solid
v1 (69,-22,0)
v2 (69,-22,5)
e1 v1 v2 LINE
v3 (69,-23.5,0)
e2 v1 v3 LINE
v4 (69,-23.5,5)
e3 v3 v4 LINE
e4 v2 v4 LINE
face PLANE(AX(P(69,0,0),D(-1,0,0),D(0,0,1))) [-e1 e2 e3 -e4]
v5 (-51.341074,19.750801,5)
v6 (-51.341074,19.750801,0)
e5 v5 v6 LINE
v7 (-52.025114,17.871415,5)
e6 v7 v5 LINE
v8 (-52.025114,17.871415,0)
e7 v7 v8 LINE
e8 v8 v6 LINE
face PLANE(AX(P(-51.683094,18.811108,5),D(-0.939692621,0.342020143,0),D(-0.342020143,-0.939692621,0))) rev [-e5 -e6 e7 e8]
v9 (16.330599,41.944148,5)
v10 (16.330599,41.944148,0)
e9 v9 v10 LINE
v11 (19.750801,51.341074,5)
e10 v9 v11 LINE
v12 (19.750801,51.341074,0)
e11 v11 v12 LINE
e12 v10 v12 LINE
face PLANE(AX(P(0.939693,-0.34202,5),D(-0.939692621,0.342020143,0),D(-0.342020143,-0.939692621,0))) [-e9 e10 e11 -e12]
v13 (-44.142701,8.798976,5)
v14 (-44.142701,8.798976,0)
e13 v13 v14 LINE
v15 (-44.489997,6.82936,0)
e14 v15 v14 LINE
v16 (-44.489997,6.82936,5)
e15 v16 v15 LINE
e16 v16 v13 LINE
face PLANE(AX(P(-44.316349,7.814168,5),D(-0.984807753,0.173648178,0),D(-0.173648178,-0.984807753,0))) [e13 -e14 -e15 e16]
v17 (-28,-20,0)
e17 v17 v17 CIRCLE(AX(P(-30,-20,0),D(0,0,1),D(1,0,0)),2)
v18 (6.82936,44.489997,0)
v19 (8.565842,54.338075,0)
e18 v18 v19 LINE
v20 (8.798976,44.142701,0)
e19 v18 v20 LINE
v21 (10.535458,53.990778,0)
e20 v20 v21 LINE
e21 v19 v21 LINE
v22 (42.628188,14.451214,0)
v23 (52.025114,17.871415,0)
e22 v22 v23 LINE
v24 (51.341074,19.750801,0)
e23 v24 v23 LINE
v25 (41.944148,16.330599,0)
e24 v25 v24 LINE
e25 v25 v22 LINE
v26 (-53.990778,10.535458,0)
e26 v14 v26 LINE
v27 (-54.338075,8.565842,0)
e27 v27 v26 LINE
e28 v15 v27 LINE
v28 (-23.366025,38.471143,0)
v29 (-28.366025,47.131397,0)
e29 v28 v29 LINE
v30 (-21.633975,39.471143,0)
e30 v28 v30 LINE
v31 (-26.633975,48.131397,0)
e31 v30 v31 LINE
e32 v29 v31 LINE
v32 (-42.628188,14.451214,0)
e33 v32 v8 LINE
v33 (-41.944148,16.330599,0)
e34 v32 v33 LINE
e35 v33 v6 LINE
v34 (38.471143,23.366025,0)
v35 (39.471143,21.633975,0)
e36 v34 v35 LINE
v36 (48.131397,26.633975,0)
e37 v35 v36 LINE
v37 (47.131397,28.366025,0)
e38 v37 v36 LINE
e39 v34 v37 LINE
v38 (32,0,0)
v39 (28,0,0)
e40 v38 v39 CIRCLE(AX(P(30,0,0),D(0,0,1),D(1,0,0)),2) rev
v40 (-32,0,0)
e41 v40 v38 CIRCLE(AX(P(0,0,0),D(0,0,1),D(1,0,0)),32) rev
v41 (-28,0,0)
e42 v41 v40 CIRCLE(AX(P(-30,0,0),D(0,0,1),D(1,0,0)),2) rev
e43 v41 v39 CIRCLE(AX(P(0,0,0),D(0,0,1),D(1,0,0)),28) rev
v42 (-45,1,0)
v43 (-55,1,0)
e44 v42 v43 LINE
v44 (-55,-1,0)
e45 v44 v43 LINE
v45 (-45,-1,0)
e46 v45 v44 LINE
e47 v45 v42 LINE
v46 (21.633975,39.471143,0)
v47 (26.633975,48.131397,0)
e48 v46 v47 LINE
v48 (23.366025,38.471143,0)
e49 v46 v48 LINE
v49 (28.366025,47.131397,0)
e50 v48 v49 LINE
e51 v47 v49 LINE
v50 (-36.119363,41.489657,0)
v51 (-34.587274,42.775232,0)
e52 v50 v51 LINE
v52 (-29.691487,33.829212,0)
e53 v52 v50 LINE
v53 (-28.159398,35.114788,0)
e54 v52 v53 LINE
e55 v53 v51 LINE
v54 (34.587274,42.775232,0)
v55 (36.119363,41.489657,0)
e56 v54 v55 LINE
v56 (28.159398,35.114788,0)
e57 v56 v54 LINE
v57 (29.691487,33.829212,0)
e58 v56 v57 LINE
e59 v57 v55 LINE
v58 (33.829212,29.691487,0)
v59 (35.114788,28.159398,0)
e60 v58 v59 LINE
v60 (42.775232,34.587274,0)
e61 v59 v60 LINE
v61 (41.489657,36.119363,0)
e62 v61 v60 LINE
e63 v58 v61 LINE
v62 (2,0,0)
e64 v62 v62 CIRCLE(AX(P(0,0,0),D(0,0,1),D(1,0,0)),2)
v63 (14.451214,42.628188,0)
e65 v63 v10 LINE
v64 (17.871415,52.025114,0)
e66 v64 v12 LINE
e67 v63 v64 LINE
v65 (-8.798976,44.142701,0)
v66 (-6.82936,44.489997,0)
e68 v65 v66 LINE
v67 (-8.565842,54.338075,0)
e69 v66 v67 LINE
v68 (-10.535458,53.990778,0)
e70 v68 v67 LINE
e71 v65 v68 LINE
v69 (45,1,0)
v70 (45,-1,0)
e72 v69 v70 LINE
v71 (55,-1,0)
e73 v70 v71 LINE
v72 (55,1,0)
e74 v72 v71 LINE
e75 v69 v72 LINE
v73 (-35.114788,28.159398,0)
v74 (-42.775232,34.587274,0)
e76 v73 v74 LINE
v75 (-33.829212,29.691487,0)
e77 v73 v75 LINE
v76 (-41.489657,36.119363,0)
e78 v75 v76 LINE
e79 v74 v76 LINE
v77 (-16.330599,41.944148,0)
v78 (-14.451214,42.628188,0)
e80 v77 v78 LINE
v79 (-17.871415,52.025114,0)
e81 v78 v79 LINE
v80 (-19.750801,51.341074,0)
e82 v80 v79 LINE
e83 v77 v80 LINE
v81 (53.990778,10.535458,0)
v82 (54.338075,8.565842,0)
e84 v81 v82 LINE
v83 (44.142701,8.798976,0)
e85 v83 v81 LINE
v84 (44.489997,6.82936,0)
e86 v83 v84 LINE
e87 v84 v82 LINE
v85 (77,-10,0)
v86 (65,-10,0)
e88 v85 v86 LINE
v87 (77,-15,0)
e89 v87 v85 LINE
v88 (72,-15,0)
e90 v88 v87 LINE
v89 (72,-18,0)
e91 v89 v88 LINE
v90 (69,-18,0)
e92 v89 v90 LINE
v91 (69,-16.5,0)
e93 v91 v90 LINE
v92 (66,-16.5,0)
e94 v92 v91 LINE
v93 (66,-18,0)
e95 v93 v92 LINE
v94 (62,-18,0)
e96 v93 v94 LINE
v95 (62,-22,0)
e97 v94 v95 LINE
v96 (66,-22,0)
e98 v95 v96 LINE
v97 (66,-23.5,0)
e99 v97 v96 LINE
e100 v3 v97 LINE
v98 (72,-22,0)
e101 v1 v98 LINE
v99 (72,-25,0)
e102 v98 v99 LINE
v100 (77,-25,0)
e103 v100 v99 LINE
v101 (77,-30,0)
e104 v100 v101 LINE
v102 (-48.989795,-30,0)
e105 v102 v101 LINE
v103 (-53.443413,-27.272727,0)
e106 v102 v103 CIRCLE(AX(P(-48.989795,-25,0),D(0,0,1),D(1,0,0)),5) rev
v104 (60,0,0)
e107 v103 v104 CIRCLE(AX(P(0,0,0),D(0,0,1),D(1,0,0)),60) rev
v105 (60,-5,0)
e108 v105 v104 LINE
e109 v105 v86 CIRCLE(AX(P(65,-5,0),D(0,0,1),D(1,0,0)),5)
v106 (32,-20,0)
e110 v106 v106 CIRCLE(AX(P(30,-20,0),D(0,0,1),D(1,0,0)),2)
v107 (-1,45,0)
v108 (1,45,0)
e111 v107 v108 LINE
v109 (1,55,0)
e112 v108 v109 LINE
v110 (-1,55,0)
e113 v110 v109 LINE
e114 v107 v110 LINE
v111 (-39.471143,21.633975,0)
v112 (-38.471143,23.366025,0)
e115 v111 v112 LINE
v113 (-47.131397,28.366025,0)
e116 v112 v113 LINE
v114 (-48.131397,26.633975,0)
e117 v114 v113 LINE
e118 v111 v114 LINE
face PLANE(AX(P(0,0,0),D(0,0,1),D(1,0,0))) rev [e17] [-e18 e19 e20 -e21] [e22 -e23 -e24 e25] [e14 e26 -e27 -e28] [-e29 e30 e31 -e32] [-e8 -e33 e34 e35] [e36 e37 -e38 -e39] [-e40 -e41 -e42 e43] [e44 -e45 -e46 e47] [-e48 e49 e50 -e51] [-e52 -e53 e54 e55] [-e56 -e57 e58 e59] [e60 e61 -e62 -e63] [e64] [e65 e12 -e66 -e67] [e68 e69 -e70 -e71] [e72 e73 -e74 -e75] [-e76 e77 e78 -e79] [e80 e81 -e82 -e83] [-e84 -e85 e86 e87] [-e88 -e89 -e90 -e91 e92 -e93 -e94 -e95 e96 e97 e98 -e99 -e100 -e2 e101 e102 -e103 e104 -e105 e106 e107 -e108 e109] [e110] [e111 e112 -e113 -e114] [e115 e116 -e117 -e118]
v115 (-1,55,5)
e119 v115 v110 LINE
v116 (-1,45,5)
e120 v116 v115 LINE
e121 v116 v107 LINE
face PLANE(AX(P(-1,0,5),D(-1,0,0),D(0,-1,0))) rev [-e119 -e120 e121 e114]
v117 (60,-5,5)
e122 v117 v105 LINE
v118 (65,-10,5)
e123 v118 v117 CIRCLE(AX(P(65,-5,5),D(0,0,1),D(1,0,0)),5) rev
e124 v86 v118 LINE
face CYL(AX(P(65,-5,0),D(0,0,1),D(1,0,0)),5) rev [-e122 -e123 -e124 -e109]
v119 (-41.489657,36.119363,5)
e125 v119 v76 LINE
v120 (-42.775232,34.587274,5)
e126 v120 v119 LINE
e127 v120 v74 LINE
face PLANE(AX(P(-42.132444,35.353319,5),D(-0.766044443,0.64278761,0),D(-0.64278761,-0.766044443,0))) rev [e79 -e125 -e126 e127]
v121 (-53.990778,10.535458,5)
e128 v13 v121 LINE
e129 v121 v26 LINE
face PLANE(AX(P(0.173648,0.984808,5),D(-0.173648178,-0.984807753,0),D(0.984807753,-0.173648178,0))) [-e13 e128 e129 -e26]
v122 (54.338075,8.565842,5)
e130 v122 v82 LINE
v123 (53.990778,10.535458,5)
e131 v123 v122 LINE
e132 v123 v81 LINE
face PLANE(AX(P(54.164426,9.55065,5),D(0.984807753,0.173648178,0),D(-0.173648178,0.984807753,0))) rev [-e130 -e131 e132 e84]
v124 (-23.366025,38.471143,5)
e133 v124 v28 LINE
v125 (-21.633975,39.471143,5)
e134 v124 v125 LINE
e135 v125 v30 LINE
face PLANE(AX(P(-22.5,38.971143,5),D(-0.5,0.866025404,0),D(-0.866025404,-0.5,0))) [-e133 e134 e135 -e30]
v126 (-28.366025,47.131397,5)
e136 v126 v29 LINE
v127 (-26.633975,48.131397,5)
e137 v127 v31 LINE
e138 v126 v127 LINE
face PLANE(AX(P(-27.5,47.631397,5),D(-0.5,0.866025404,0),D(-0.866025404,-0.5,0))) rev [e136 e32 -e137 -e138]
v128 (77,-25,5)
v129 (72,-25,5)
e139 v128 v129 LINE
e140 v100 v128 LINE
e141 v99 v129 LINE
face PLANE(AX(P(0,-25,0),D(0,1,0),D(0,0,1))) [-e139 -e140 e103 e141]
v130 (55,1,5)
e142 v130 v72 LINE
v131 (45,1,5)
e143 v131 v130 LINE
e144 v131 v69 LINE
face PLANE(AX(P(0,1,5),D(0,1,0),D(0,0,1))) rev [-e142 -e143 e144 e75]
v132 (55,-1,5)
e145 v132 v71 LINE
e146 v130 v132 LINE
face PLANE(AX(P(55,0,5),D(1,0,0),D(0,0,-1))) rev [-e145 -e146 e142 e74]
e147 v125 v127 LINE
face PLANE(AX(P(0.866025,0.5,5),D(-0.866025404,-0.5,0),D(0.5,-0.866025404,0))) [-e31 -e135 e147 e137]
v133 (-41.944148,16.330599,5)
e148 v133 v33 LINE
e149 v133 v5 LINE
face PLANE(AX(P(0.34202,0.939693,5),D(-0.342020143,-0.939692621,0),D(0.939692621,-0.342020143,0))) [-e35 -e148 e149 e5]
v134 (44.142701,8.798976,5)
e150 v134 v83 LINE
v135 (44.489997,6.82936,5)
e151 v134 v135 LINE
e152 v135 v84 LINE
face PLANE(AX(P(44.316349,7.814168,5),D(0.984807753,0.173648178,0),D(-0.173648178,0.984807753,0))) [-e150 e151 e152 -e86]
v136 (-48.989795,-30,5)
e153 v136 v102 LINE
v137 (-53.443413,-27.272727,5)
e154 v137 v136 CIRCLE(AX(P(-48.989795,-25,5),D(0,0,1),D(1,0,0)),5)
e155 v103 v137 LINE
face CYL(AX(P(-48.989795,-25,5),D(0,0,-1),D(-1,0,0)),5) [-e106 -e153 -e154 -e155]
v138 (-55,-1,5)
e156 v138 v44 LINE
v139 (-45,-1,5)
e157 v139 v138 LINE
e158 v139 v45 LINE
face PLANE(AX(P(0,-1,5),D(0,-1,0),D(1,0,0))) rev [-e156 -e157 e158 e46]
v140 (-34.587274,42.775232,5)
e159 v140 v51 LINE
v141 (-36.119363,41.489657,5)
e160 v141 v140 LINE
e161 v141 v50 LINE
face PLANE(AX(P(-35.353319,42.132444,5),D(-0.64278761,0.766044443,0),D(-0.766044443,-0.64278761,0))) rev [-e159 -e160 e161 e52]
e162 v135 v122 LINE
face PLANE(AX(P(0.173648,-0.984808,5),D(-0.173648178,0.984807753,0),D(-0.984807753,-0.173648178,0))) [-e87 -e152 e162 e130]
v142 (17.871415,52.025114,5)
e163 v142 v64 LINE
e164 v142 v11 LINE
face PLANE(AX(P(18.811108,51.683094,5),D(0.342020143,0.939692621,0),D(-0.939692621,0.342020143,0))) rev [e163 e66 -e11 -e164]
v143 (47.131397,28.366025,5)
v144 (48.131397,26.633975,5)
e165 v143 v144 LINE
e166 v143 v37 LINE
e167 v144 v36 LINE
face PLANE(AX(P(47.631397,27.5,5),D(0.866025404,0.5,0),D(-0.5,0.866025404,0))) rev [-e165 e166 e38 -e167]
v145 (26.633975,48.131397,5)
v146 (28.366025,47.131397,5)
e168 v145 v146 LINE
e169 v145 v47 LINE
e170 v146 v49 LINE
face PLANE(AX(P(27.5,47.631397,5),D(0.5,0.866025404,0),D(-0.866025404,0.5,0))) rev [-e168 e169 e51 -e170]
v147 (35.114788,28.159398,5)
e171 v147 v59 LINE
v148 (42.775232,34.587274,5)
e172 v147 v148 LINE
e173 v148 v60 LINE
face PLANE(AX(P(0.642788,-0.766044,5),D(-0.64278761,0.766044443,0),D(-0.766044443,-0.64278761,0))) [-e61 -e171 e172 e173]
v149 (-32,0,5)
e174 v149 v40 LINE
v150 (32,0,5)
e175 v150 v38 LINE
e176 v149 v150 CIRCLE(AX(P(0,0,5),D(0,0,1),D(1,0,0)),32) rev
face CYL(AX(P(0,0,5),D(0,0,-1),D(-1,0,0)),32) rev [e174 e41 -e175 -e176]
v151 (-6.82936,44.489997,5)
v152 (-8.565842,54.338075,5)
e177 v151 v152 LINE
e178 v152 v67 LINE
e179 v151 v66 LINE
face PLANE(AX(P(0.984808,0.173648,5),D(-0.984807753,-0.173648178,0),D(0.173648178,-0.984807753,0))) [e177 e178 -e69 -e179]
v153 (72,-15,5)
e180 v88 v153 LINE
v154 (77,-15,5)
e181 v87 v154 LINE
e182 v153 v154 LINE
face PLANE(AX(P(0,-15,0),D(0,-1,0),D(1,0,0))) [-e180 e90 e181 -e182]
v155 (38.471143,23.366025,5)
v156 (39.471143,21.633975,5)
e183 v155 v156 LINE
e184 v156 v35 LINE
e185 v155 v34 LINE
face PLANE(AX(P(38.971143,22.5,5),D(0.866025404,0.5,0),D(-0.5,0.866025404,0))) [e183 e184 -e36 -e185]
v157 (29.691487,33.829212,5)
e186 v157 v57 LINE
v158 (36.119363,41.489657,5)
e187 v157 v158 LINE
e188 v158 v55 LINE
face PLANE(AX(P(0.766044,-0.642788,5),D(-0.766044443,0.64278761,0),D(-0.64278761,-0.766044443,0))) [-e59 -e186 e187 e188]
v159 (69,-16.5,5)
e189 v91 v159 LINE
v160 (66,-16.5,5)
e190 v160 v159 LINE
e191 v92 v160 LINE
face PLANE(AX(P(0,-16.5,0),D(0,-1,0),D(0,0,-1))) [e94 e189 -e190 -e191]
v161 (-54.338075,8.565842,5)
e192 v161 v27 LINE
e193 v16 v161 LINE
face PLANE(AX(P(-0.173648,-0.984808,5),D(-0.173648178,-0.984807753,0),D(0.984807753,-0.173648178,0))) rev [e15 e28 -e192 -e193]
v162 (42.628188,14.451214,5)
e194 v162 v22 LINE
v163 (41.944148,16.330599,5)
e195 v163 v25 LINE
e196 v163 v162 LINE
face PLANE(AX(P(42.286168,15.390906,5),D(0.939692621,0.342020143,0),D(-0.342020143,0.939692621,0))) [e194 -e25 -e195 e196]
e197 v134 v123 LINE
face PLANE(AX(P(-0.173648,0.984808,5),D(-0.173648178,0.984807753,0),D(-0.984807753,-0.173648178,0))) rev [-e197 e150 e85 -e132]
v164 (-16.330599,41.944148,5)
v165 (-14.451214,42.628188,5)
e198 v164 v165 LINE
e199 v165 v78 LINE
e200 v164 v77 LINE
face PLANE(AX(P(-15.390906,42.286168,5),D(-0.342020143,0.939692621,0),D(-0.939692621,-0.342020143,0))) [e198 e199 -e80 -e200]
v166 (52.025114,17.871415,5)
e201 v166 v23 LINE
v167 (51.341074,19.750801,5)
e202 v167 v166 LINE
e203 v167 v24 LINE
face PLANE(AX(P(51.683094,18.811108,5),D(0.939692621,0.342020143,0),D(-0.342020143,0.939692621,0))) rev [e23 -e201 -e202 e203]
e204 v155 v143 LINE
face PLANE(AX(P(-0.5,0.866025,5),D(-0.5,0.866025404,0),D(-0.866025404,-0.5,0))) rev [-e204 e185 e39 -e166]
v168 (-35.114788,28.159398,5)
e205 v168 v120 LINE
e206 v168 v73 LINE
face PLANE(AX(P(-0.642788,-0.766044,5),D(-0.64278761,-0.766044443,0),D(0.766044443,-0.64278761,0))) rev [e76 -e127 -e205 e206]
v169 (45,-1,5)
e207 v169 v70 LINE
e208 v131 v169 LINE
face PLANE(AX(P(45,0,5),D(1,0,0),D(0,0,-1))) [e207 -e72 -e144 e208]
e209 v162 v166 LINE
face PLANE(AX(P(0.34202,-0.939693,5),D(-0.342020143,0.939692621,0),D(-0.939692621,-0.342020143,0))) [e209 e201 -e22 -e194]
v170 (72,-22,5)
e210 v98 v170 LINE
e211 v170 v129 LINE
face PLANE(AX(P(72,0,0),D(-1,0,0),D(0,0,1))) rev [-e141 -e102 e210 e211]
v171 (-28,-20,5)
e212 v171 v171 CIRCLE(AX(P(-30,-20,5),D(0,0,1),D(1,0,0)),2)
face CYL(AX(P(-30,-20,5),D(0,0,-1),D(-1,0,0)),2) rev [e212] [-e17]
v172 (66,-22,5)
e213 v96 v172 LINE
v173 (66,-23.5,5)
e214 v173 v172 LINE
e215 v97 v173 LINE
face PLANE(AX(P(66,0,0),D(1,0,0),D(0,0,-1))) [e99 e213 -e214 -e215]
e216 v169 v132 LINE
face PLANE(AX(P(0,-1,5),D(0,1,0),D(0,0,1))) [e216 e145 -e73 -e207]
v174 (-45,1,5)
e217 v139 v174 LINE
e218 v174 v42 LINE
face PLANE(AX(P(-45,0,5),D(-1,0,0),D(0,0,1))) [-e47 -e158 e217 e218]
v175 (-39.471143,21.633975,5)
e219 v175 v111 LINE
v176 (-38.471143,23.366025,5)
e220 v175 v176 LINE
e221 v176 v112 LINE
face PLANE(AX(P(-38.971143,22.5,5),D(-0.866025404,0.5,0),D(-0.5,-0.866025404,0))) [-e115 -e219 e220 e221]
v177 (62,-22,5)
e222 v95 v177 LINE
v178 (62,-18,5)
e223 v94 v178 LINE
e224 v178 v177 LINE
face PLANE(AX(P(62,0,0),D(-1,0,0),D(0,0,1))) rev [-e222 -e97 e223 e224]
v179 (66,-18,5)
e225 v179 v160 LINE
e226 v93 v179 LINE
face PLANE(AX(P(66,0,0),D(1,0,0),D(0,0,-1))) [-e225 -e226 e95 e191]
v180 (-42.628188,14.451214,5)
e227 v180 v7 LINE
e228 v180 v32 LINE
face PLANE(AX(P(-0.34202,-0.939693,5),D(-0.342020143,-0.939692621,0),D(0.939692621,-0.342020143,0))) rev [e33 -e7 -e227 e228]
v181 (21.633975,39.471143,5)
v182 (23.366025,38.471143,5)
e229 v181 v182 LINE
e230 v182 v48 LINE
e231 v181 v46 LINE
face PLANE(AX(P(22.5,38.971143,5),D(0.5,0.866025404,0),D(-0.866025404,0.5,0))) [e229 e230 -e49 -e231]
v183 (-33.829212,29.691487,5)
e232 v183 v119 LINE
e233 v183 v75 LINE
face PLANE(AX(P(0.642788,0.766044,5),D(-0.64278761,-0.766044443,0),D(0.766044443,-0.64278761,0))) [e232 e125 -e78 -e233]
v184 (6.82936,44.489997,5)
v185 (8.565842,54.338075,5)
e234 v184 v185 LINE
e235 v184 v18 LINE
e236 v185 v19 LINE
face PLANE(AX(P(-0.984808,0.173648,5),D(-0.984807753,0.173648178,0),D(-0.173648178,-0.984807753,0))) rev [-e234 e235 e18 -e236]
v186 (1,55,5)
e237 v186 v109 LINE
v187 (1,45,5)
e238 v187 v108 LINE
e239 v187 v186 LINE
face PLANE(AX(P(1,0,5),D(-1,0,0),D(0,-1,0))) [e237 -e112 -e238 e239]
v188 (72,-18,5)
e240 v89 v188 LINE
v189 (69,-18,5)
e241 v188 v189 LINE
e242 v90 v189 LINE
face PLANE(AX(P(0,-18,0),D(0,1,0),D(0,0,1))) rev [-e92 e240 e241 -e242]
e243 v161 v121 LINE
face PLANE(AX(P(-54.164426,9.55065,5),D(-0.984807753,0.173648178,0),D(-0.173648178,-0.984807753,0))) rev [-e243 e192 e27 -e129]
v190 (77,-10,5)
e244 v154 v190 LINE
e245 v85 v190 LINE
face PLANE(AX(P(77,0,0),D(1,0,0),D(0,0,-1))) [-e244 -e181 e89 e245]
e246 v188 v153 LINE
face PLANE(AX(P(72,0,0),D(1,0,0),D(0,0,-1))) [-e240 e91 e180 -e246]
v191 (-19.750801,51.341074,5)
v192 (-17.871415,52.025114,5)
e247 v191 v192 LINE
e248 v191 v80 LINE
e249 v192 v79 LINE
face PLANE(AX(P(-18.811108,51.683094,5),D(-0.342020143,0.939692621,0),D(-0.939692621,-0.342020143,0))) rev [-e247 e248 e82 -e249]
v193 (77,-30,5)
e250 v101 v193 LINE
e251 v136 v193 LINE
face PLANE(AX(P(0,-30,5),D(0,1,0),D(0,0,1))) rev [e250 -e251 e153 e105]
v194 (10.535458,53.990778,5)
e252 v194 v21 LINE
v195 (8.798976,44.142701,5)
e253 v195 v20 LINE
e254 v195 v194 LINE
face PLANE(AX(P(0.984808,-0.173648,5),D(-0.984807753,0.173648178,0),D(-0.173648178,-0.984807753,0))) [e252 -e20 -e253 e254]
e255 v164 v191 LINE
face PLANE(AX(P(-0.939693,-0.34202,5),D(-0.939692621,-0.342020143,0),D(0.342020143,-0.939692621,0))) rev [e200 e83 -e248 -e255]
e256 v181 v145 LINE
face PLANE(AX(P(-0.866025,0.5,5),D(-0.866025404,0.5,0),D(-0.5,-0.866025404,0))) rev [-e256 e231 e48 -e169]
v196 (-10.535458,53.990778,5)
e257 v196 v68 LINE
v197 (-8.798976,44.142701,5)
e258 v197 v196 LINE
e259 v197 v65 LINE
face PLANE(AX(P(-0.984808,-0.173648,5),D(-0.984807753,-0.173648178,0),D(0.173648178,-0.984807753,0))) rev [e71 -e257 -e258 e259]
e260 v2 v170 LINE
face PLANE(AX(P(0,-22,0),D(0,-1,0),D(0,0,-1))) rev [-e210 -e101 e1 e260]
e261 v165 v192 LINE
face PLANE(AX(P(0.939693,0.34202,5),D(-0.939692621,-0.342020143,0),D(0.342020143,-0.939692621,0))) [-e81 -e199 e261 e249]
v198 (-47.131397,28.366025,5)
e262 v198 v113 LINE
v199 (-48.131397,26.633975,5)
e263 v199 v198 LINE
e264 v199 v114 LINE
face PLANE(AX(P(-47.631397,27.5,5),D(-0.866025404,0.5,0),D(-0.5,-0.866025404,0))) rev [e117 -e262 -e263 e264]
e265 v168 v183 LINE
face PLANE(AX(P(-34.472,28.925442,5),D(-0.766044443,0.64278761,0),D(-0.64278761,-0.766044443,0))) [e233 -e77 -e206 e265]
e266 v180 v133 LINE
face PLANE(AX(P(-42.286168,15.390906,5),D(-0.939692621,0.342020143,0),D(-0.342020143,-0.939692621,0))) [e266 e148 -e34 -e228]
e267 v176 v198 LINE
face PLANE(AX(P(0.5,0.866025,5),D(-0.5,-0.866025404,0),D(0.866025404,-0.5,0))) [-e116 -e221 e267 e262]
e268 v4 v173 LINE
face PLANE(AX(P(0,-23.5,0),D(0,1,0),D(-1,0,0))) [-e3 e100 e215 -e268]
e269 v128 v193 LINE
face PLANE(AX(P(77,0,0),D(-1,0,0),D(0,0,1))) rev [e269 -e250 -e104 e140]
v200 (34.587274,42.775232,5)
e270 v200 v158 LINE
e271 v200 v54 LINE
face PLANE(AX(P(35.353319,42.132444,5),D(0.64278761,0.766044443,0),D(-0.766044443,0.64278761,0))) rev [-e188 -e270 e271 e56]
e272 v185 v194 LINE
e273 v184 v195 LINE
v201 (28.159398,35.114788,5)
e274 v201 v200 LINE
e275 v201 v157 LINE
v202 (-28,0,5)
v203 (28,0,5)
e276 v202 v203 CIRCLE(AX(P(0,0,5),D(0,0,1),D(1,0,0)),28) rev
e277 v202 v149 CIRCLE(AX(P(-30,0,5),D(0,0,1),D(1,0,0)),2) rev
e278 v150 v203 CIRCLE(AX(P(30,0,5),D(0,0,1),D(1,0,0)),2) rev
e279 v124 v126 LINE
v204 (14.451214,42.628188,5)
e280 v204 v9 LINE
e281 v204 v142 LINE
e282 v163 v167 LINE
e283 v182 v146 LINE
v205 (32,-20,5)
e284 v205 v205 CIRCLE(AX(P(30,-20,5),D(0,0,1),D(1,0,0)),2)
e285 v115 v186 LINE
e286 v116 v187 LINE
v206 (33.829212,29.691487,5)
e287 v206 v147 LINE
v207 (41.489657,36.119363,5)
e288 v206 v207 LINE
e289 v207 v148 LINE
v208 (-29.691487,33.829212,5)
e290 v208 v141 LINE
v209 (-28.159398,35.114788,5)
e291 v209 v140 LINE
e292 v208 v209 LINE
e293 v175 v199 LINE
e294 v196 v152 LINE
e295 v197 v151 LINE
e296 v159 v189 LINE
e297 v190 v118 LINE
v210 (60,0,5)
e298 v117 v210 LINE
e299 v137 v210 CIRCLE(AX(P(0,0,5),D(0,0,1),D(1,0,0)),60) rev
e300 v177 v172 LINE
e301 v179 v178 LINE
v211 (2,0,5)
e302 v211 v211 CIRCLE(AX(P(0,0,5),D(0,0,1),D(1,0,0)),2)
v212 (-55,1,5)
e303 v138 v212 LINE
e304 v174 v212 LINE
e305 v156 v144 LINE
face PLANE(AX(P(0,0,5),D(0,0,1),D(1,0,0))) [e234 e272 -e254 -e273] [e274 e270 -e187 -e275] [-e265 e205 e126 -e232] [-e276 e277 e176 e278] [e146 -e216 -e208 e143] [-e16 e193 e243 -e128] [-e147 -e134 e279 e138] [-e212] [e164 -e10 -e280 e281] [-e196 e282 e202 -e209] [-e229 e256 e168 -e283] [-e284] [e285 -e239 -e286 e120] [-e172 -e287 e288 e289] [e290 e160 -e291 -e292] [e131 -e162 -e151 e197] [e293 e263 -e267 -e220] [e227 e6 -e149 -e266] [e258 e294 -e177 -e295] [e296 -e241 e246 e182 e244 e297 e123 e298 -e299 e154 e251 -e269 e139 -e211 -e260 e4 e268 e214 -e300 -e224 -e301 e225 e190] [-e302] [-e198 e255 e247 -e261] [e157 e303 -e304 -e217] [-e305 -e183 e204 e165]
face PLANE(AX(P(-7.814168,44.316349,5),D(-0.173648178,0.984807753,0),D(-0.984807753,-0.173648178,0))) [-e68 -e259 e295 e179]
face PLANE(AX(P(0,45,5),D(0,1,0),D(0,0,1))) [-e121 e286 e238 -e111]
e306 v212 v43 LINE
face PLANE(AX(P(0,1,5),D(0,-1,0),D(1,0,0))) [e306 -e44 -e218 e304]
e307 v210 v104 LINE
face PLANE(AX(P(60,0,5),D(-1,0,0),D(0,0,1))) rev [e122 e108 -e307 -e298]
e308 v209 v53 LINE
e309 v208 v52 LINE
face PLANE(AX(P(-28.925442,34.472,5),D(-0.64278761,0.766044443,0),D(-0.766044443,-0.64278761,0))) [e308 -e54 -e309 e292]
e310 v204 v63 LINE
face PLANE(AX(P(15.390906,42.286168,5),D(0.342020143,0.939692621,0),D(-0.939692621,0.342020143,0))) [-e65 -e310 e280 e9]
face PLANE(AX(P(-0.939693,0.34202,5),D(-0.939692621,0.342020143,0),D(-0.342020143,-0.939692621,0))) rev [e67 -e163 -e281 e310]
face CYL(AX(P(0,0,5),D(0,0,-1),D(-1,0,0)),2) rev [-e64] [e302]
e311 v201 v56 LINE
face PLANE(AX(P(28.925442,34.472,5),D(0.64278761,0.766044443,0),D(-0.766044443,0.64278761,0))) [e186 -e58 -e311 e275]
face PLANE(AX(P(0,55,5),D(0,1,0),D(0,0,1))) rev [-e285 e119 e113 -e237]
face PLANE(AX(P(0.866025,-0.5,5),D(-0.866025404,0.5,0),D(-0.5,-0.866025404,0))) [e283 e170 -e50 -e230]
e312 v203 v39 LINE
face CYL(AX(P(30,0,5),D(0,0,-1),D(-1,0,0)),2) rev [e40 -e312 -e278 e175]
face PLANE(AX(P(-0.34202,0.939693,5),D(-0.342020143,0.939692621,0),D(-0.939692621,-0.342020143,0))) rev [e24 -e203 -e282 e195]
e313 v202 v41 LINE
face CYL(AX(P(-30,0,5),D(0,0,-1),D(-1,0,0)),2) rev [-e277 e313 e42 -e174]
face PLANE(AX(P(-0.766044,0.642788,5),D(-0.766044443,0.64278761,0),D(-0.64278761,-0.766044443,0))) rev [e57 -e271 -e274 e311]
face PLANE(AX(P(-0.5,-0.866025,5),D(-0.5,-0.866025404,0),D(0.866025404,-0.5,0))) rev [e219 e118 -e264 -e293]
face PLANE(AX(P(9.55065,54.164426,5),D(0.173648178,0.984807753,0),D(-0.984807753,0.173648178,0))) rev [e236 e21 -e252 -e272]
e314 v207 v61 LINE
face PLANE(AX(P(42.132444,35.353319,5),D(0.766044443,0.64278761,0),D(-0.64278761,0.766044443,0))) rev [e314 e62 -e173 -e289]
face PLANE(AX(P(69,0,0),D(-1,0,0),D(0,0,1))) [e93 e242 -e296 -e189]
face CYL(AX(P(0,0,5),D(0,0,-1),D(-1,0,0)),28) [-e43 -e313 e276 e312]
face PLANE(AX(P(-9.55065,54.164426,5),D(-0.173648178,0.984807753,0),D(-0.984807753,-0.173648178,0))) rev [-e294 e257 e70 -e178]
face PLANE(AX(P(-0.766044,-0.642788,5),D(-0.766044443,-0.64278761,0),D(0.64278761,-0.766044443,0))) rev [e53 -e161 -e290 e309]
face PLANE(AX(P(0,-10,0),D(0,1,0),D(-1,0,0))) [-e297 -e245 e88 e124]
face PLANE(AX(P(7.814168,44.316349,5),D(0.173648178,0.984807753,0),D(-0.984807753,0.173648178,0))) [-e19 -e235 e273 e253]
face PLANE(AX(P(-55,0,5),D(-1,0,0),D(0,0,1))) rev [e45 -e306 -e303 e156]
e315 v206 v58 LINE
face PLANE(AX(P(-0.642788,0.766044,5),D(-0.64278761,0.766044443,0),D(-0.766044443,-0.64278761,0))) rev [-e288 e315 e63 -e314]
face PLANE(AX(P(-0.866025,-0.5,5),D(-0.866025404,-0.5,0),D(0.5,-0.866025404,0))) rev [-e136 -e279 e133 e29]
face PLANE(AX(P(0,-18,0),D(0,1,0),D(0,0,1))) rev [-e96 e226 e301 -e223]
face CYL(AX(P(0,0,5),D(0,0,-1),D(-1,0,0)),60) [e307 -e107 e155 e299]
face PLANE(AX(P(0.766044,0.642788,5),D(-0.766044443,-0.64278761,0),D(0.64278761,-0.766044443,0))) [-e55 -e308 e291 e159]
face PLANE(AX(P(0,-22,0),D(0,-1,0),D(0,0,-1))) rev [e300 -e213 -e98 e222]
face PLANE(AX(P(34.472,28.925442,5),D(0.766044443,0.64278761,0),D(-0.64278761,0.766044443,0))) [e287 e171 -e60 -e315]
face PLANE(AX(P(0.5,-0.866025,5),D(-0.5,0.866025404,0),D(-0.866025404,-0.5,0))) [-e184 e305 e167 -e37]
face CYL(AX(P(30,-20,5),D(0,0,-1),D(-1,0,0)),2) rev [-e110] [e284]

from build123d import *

# Parameters (mm, degrees)
BOSS_EXTRU_1_OUTLINE_R   = 2
BOSS_EXTRU_1_OUTLINE_W   = 10
BOSS_EXTRU_1_OUTLINE_H   = 2
BOSS_EXTRU_1_OUTLINE_W_2 = 2
BOSS_EXTRU_1_OUTLINE_H_2 = 10
BOSS_EXTRU_1_DEPTH       = 5
BOSS_EXTRU_2_DEPTH       = 5
CONG_1_R                 = 5


with BuildPart() as part:
    # Boss.-Extru.1: read off the stored shape, not the designer's step
    # Boss.-Extru.1 outline → Boss.-Extru.1 (new body)
    with BuildSketch(Plane.XY):
        with BuildLine():
            ThreePointArc((60, 0), (-15.529142706, 57.955549577), (-51.961524227, -30))
            Line((-51.961524227, -30), (60, -30))
            Line((60, -30), (60, 0))
        make_face()
        with Locations((-30, -20)):
            Circle(BOSS_EXTRU_1_OUTLINE_R, mode=Mode.SUBTRACT)
        with Locations((-50, 0)):
            Rectangle(BOSS_EXTRU_1_OUTLINE_W, BOSS_EXTRU_1_OUTLINE_H, mode=Mode.SUBTRACT)
        Polygon((-53.990778238, 10.535457525), (-44.142700708, 8.798975748), (-44.489997063, 6.829360242), (-54.338074593, 8.565842019), align=None, mode=Mode.SUBTRACT)
        Circle(BOSS_EXTRU_1_OUTLINE_R, mode=Mode.SUBTRACT)
        with Locations((30, -20)):
            Circle(BOSS_EXTRU_1_OUTLINE_R, mode=Mode.SUBTRACT)
        with Locations((50, 0)):
            Rectangle(BOSS_EXTRU_1_OUTLINE_W, BOSS_EXTRU_1_OUTLINE_H, mode=Mode.SUBTRACT)
        Polygon((54.338074593, 8.565842019), (44.489997063, 6.829360242), (44.142700708, 8.798975748), (53.990778238, 10.535457525), align=None, mode=Mode.SUBTRACT)
        Polygon((-51.341074, 19.750800504), (-41.944147792, 16.33059907), (-42.628188079, 14.451213829), (-52.025114287, 17.871415262), align=None, mode=Mode.SUBTRACT)
        Polygon((-47.131397208, 28.366025404), (-38.47114317, 23.366025404), (-39.47114317, 21.633974596), (-48.131397208, 26.633974596), align=None, mode=Mode.SUBTRACT)
        Polygon((-41.489656762, 36.119362976), (-33.829212331, 29.691486879), (-35.11478755, 28.159397993), (-42.775231981, 34.58727409), align=None, mode=Mode.SUBTRACT)
        with BuildLine():
            ThreePointArc((-28, 0), (-30, -2), (-32, 0))
            ThreePointArc((-32, 0), (0, 32), (32, 0))
            ThreePointArc((32, 0), (30, -2), (28, 0))
            ThreePointArc((28, 0), (0, 28), (-28, 0))
        make_face(mode=Mode.SUBTRACT)
        Polygon((-34.58727409, 42.775231981), (-28.159397993, 35.11478755), (-29.691486879, 33.829212331), (-36.119362976, 41.489656762), align=None, mode=Mode.SUBTRACT)
        Polygon((-26.633974596, 48.131397208), (-21.633974596, 39.47114317), (-23.366025404, 38.47114317), (-28.366025404, 47.131397208), align=None, mode=Mode.SUBTRACT)
        Polygon((-17.871415262, 52.025114287), (-14.451213829, 42.628188079), (-16.33059907, 41.944147792), (-19.750800504, 51.341074), align=None, mode=Mode.SUBTRACT)
        Polygon((-8.565842019, 54.338074593), (-6.829360242, 44.489997063), (-8.798975748, 44.142700708), (-10.535457525, 53.990778238), align=None, mode=Mode.SUBTRACT)
        with Locations((0, 50)):
            Rectangle(BOSS_EXTRU_1_OUTLINE_W_2, BOSS_EXTRU_1_OUTLINE_H_2, mode=Mode.SUBTRACT)
        Polygon((48.131397208, 26.633974596), (39.47114317, 21.633974596), (38.47114317, 23.366025404), (47.131397208, 28.366025404), align=None, mode=Mode.SUBTRACT)
        Polygon((52.025114287, 17.871415262), (42.628188079, 14.451213829), (41.944147792, 16.33059907), (51.341074, 19.750800504), align=None, mode=Mode.SUBTRACT)
        Polygon((42.775231981, 34.58727409), (35.11478755, 28.159397993), (33.829212331, 29.691486879), (41.489656762, 36.119362976), align=None, mode=Mode.SUBTRACT)
        Polygon((19.750800504, 51.341074), (16.33059907, 41.944147792), (14.451213829, 42.628188079), (17.871415262, 52.025114287), align=None, mode=Mode.SUBTRACT)
        Polygon((28.366025404, 47.131397208), (23.366025404, 38.47114317), (21.633974596, 39.47114317), (26.633974596, 48.131397208), align=None, mode=Mode.SUBTRACT)
        Polygon((10.535457525, 53.990778238), (8.798975748, 44.142700708), (6.829360242, 44.489997063), (8.565842019, 54.338074593), align=None, mode=Mode.SUBTRACT)
        Polygon((36.119362976, 41.489656762), (29.691486879, 33.829212331), (28.159397993, 35.11478755), (34.58727409, 42.775231981), align=None, mode=Mode.SUBTRACT)
    extrude(amount=BOSS_EXTRU_1_DEPTH)

    # Esquisse2 → Boss.-Extru.2 (add)
    with BuildSketch(Plane.XY.offset(5)):
        Polygon((69, -22), (72, -22), (72, -25), (77, -25), (77, -30), (72, -30), (60, -30), (60, -10), (72, -10), (77, -10), (77, -15), (72, -15), (72, -18), (69, -18), (69, -16.5), (66, -16.5), (66, -18), (62, -18), (62, -22), (66, -22), (66, -23.5), (69, -23.5), align=None)
    extrude(amount=-BOSS_EXTRU_2_DEPTH)

    # Congé1
    cong_1_edges = [part.edges().sort_by_distance(p)[0] for p in [
        (-51.961524227, -30, 2.5),
        (60, -10, 2.5),
    ]]
    fillet(cong_1_edges, radius=CONG_1_R)


solid = part.part
